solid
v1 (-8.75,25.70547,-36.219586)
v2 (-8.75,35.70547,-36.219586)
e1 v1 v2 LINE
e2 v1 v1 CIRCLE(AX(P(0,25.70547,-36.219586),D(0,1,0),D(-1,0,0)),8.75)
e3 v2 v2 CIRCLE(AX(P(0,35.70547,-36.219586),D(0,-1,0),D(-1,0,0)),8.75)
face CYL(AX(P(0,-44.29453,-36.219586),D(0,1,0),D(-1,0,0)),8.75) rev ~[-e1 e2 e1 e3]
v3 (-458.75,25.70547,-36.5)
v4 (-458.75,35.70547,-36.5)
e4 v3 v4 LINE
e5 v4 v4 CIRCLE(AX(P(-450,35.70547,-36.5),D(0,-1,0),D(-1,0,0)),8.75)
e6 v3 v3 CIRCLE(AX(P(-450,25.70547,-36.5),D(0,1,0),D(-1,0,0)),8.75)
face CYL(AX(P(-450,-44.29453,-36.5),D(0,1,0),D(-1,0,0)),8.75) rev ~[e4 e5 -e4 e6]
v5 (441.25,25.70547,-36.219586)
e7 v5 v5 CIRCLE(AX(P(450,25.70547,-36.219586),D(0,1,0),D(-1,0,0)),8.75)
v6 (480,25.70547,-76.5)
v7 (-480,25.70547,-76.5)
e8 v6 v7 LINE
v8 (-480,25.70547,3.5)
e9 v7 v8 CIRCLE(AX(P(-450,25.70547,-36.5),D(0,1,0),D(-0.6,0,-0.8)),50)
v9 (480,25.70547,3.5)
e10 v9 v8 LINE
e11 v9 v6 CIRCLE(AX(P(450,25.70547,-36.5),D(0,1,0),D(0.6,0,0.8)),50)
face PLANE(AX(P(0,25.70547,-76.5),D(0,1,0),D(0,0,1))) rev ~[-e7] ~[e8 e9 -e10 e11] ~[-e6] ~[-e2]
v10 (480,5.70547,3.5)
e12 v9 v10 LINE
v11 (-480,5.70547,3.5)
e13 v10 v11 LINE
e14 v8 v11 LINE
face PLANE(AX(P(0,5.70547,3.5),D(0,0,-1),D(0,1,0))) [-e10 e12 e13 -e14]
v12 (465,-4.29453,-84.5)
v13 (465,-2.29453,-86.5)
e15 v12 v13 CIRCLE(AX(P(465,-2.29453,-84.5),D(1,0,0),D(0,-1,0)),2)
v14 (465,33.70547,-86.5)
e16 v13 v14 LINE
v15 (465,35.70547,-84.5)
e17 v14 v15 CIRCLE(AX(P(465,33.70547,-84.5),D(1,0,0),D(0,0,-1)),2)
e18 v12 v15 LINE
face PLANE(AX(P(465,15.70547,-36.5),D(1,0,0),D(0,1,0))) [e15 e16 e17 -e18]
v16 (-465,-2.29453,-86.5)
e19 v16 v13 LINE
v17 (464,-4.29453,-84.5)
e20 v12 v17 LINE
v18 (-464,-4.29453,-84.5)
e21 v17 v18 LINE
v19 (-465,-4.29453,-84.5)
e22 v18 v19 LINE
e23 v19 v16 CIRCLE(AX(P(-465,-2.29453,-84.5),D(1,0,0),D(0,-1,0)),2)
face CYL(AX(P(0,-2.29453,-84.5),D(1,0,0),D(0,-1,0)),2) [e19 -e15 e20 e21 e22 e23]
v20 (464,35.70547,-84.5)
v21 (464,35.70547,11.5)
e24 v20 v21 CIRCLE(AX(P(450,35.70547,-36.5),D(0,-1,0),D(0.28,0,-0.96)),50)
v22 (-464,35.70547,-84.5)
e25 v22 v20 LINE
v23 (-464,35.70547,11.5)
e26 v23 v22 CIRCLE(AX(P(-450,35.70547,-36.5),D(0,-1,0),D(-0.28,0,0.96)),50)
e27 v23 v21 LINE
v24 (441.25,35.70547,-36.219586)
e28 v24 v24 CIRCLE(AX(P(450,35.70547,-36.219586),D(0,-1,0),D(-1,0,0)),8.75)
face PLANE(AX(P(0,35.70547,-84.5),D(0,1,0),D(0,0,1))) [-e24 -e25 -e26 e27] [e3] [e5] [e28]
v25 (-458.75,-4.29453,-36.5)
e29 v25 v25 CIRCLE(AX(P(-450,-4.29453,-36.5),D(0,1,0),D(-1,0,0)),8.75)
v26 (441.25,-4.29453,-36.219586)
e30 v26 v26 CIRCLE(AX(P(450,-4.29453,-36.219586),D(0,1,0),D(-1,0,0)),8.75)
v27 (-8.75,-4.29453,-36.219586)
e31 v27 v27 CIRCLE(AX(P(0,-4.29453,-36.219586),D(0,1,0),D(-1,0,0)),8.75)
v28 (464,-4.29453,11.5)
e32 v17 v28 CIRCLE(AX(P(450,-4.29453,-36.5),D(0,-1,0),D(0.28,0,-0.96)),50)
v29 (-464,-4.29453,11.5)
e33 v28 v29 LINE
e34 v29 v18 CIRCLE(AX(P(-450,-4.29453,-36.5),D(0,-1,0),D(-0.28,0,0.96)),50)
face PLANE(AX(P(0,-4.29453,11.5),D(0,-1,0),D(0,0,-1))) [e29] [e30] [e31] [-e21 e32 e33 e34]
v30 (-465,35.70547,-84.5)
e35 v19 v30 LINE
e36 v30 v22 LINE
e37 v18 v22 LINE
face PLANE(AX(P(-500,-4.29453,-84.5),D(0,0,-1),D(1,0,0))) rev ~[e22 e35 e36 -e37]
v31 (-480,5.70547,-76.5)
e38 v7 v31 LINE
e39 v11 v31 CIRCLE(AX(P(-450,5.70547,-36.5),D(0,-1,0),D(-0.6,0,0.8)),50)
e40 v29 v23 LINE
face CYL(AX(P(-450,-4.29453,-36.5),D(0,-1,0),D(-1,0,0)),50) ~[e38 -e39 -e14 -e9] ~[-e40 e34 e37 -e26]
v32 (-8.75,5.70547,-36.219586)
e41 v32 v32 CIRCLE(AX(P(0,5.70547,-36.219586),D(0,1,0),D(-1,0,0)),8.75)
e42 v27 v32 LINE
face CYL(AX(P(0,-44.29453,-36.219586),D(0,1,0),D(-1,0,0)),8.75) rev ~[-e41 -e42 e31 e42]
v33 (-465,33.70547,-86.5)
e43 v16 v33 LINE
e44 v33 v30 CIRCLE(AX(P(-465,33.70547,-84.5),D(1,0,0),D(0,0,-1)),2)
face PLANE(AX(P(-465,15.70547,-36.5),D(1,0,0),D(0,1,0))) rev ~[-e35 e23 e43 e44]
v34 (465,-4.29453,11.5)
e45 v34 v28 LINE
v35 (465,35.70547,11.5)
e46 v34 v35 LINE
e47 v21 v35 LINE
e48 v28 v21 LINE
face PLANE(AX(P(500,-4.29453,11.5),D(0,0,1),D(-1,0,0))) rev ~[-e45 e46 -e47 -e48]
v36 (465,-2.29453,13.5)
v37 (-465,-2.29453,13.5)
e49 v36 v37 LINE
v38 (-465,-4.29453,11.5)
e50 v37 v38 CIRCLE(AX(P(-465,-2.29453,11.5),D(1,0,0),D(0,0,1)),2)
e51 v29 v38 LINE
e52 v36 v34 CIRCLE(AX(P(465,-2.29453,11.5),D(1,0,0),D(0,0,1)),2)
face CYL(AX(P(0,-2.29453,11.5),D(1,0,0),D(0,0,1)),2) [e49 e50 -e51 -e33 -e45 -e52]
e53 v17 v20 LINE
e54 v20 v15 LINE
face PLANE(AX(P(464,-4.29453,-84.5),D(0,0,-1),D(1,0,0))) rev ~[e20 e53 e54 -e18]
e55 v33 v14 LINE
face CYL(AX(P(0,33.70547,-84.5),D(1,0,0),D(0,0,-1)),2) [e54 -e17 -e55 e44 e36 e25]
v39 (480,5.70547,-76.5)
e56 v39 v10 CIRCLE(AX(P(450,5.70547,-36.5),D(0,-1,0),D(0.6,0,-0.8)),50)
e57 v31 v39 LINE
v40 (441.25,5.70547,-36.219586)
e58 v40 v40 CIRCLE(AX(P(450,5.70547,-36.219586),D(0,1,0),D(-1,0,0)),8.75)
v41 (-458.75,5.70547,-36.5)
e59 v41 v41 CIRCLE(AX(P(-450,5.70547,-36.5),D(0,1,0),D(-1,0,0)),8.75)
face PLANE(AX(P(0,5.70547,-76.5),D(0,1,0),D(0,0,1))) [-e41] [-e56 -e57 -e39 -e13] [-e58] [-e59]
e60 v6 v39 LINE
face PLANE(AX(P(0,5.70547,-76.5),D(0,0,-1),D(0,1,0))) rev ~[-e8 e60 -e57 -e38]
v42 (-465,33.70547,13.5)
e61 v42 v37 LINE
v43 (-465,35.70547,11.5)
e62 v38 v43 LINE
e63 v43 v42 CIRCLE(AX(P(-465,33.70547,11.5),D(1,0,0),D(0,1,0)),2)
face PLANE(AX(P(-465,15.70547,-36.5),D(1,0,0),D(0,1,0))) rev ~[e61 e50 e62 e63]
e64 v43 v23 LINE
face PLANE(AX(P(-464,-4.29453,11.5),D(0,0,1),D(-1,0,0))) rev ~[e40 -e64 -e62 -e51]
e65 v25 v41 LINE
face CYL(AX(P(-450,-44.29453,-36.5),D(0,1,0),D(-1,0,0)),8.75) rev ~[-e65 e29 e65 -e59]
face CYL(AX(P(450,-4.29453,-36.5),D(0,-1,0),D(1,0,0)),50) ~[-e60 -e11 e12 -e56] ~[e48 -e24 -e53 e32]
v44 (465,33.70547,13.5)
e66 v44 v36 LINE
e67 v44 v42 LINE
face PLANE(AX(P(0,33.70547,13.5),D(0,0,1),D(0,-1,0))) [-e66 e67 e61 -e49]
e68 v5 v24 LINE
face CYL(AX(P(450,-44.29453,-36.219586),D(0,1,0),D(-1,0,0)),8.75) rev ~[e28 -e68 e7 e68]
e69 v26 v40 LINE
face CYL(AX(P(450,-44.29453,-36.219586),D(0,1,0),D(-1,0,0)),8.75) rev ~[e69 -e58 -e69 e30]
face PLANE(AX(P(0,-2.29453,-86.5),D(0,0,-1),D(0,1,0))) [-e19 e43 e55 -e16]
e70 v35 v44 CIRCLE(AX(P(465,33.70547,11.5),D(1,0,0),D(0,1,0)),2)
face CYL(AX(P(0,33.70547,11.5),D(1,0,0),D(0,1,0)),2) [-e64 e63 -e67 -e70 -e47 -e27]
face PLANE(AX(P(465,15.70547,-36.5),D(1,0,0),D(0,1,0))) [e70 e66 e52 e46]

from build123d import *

# Parameters (mm, degrees)
F3_W     = 20
F3_H     = 80
F4_DEPTH = 500
F6_D     = 17.5
F6_DEPTH = 40
F6_TIP   = 5.2575304165
F7_DEPTH = 40
F8_DEPTH = 35
F9_DEPTH = 35


# Not quite as in the source:
# - a feature names something its author has since deleted; it is built from what else it names


with BuildPart() as f4:
    # F3 (on Right) → F4 (new body, symmetric)
    with BuildSketch(Plane.YZ):
        with BuildLine():
            ThreePointArc((-4.2945303673, -84.5), (-3.7087439297, -85.9142135624), (-2.2945303673, -86.5))
            Line((-2.2945303673, -86.5), (33.7054696327, -86.5))
            ThreePointArc((33.7054696327, -86.5), (35.1196831951, -85.9142135624), (35.7054696327, -84.5))
            Line((35.7054696327, -84.5), (35.7054696327, 11.5))
            ThreePointArc((35.7054696327, 11.5), (35.1196831951, 12.9142135624), (33.7054696327, 13.5))
            Line((33.7054696327, 13.5), (-2.2945303673, 13.5))
            ThreePointArc((-2.2945303673, 13.5), (-3.7087439297, 12.9142135624), (-4.2945303673, 11.5))
            Line((-4.2945303673, 11.5), (-4.2945303673, -84.5))
        make_face()
        with Locations((15.7054696327, -36.5)):
            Rectangle(F3_W, F3_H, mode=Mode.SUBTRACT)
    extrude(amount=F4_DEPTH, both=True)

    # F6
    with Locations(Plane.XZ.offset(4.2945303673)):
        with Locations((450, -36.2195856869), (0, -36.2195856869), (-450, -36.5)):
            Hole(F6_D / 2, depth=F6_DEPTH)
            with Locations((0, 0, -(F6_DEPTH + F6_TIP / 2))):  # 118° drill point
                Cone(0, F6_D / 2, F6_TIP, mode=Mode.SUBTRACT)

    # F5 (on face) → F7 (cut)
    with BuildSketch(Plane.XZ.offset(4.2945303673)):
        with BuildLine():
            ThreePointArc((-500, -36.5), (-490, -6.5), (-464, 11.5))
            Line((-464, 11.5), (-500, 11.5))
            Line((-500, 11.5), (-500, -36.5))
        make_face()
        with BuildLine():
            ThreePointArc((-464, -84.5), (-490, -66.5), (-500, -36.5))
            Line((-500, -36.5), (-500, -84.5))
            Line((-500, -84.5), (-464, -84.5))
        make_face()
        with BuildLine():
            Line((500, 11.5), (464, 11.5))
            ThreePointArc((464, 11.5), (490, -6.5), (500, -36.5))
            Line((500, -36.5), (500, 11.5))
        make_face()
        with BuildLine():
            Line((500, -84.5), (500, -36.5))
            ThreePointArc((500, -36.5), (490, -66.5), (464, -84.5))
            Line((464, -84.5), (500, -84.5))
        make_face()
    extrude(amount=-F7_DEPTH, mode=Mode.SUBTRACT)

    # F8 (cut): faces of the model
    f8_faces = [f4.faces().sort_by_distance(p)[0] for p in [
        (-500, 15.7054696327, 12.4878664624),
        (-500, 15.7054696327, -85.4878664624),
    ]]
    extrude(f8_faces, amount=-F8_DEPTH, mode=Mode.SUBTRACT)

    # F9 (cut): faces of the model
    f9_faces = [f4.faces().sort_by_distance(p)[0] for p in [
        (500, 15.7054696327, -85.4878664624),
        (500, 15.7054696327, 12.4878664624),
    ]]
    extrude(f9_faces, amount=-F9_DEPTH, mode=Mode.SUBTRACT)


solid = f4.part
